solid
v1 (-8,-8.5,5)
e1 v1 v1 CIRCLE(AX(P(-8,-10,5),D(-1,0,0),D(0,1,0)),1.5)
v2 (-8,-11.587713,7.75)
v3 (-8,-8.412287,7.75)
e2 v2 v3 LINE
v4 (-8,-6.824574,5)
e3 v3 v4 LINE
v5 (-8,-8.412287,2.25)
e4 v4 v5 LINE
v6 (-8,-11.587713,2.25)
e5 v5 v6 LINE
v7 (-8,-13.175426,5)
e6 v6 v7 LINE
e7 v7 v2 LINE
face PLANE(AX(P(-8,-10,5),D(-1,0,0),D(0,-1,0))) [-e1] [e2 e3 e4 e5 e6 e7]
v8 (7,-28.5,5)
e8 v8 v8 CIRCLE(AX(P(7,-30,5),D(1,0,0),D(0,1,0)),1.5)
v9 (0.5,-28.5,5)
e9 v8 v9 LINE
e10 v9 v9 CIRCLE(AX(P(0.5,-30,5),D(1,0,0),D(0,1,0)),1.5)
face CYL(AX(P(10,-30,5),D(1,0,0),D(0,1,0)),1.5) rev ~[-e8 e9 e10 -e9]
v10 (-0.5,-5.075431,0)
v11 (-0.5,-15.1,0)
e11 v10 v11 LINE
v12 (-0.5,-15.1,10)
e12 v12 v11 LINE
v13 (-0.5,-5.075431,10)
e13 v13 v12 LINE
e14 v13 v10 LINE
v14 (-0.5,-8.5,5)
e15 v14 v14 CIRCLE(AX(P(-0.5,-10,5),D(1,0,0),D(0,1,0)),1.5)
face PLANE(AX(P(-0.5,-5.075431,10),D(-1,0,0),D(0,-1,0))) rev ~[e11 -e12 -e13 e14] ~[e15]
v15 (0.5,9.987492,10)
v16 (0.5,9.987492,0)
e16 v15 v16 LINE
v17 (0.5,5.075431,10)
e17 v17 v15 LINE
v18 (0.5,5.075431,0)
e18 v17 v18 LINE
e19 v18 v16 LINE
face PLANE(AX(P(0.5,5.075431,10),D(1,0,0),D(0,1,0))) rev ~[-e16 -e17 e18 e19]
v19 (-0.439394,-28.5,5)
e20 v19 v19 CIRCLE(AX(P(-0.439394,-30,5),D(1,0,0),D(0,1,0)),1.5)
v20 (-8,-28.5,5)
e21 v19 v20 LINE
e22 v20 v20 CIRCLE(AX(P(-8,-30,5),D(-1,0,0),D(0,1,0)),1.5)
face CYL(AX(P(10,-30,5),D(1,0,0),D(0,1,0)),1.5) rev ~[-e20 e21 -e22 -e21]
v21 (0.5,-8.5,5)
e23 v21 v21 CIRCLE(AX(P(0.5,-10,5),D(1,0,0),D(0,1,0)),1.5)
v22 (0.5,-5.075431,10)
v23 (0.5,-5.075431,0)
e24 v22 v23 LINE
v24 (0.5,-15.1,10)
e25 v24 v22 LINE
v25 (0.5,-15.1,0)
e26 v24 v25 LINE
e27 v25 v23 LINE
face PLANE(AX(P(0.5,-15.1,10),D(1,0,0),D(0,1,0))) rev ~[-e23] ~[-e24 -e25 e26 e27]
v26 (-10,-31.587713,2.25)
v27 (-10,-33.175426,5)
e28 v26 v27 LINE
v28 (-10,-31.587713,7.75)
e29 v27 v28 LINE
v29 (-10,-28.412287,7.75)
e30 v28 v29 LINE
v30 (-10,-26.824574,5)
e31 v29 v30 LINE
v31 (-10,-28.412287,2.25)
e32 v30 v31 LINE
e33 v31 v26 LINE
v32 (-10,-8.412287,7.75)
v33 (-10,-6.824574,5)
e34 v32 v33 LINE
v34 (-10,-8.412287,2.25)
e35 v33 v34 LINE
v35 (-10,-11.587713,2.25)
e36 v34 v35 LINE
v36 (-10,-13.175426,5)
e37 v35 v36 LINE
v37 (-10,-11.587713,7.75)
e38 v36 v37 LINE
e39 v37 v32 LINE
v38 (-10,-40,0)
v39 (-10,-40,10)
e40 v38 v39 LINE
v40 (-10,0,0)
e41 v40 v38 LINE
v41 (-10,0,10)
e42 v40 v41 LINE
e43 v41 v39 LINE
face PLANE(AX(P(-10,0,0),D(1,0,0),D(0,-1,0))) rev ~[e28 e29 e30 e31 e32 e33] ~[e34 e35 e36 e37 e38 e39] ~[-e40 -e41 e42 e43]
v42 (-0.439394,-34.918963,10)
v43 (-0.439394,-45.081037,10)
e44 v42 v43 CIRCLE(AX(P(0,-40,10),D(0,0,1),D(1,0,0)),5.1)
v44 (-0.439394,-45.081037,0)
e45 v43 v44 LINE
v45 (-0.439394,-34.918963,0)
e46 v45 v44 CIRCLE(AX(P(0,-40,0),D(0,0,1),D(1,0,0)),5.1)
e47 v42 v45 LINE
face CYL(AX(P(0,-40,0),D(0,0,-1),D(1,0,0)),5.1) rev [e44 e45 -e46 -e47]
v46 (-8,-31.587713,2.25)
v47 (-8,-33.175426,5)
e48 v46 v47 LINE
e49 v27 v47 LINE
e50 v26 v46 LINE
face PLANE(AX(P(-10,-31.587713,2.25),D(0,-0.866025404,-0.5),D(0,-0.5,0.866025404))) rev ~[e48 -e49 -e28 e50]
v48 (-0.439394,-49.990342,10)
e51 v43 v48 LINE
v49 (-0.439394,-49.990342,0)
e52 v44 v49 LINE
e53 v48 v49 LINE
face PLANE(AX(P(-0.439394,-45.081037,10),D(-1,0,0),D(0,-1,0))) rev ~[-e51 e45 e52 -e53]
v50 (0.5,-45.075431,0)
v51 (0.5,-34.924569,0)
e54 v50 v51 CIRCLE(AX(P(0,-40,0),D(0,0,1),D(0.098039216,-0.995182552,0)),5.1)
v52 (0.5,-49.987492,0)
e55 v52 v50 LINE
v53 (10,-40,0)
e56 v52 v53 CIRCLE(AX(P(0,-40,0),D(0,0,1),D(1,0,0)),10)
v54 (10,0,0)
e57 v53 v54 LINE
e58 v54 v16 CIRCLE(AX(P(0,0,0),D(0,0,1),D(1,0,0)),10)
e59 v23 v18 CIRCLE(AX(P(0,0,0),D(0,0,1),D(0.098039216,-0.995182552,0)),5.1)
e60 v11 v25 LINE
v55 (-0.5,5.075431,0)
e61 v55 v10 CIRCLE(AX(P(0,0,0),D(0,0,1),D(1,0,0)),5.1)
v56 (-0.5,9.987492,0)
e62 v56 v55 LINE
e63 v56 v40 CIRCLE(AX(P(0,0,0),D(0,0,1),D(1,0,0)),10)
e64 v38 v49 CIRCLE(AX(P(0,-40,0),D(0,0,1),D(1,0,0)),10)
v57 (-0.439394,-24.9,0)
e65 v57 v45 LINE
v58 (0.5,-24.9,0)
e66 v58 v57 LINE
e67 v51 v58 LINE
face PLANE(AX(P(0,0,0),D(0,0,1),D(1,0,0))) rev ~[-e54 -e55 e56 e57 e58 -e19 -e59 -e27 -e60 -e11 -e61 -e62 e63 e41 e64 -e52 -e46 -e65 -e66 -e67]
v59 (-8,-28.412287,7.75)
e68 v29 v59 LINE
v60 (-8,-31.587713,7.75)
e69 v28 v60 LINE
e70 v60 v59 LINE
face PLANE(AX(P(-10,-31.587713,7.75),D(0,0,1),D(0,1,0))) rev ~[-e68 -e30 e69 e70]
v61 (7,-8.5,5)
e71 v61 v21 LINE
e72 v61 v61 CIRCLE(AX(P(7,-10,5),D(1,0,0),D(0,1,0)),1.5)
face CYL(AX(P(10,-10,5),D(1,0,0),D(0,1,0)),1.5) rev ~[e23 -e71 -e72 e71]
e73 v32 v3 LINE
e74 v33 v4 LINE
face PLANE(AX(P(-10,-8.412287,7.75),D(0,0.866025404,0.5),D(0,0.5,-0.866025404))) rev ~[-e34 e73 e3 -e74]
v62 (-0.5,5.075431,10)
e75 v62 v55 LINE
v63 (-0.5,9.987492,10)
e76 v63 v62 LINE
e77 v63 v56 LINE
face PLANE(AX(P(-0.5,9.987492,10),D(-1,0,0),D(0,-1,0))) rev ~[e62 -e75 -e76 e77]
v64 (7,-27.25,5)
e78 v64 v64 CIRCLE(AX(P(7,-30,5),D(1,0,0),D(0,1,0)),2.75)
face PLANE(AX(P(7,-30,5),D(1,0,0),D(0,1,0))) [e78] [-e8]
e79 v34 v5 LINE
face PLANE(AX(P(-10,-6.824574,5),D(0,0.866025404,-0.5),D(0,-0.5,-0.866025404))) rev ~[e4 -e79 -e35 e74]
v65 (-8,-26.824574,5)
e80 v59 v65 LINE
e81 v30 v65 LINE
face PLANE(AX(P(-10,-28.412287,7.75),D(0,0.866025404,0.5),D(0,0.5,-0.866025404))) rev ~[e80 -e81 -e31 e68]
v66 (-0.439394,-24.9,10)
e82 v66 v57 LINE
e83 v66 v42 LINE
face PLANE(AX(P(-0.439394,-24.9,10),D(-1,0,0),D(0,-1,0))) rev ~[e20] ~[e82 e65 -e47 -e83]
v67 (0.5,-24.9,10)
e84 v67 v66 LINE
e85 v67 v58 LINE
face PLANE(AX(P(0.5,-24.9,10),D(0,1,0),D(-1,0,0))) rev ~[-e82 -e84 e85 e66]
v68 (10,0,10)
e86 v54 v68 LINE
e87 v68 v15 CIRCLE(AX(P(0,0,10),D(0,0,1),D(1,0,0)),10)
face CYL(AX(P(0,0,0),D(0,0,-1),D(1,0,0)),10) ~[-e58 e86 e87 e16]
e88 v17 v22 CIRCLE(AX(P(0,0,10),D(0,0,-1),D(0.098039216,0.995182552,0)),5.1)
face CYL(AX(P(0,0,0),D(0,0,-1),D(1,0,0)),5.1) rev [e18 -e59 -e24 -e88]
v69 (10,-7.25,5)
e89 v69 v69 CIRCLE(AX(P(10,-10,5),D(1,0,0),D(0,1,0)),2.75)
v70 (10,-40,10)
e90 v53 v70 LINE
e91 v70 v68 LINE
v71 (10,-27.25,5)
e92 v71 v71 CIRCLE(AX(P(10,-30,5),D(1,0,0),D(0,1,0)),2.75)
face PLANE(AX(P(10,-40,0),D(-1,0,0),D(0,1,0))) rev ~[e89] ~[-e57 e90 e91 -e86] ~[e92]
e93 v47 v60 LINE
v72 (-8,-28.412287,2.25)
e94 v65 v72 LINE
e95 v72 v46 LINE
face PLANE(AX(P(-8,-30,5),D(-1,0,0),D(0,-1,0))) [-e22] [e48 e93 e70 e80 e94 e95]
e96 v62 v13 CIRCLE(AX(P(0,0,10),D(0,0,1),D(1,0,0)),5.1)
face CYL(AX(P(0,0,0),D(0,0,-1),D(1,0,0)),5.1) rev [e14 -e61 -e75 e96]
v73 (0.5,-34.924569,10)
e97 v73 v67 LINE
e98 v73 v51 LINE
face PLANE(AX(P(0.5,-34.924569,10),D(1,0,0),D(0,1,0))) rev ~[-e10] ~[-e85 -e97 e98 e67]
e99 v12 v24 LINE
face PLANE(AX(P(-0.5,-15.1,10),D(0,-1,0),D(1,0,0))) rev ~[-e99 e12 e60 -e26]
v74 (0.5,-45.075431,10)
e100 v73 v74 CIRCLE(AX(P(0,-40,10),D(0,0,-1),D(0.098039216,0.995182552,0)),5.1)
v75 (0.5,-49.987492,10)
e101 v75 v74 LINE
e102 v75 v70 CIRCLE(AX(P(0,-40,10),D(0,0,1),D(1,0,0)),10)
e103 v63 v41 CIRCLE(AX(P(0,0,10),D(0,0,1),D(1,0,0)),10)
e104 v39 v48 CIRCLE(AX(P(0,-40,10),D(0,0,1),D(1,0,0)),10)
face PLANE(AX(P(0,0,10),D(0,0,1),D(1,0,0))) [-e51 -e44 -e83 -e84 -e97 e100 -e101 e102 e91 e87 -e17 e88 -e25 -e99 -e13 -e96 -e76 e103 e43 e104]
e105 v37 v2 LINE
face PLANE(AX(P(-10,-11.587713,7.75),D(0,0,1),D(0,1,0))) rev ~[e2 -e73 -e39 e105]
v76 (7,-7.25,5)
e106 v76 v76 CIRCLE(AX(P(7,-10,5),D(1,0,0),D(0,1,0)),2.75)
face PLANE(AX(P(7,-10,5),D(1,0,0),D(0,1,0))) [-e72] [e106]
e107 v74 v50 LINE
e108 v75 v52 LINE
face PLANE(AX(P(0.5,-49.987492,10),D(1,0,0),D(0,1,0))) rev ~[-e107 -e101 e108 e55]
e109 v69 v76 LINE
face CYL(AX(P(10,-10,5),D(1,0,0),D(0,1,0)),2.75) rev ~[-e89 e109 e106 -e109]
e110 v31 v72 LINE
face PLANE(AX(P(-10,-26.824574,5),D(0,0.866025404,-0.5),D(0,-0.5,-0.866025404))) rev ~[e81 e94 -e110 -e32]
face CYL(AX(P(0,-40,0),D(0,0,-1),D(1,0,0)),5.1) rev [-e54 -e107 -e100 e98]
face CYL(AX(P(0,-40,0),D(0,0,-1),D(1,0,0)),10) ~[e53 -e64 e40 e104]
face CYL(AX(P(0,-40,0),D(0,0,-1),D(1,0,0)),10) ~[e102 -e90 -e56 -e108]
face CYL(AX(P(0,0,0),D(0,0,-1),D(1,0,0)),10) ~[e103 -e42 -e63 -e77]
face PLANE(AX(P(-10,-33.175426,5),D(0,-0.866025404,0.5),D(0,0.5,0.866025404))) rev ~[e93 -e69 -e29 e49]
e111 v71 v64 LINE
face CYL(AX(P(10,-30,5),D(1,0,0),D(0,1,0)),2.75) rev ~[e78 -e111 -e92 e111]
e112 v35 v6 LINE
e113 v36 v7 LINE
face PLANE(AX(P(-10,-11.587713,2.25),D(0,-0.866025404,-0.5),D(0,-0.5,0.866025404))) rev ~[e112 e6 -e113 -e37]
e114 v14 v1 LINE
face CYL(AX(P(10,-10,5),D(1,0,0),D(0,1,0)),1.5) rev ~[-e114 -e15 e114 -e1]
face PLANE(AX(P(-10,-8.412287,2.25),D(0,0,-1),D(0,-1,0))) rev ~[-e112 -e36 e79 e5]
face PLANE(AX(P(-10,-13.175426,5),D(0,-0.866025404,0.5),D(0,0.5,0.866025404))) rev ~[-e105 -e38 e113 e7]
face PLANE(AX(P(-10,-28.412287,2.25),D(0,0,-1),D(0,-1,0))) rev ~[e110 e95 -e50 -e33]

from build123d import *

# Parameters (mm, degrees)
F0_R     = 5.1
F1_DEPTH = 10
F2_R     = 1.5
F3_DEPTH = 25
F5_DEPTH = 25
F6_R     = 2.75
F6_R_2   = 1.5
F7_DEPTH = 3
F8_R     = 1.5
F9_DEPTH = 2


# Not quite as in the source:
# - a feature names something its author has since deleted; it is built from what else it names


with BuildPart() as f1:
    # F0 (on Top) → F1 (new body)
    with BuildSketch(Plane.XY):
        with BuildLine():
            ThreePointArc((-10, 0), (0, -10), (10, 0))
            ThreePointArc((10, 0), (0, 10), (-10, 0))
        make_face()
        Circle(F0_R, mode=Mode.SUBTRACT)
        with BuildLine():
            Line((10, -40), (10, 0))
            ThreePointArc((10, 0), (0, -10), (-10, 0))
            Line((-10, 0), (-10, -40))
            ThreePointArc((-10, -40), (0, -30), (10, -40))
        make_face()
        with BuildLine():
            ThreePointArc((-10, -40), (0, -50), (10, -40))
            ThreePointArc((10, -40), (0, -30), (-10, -40))
        make_face()
        with Locations((0, -40)):
            Circle(F0_R, mode=Mode.SUBTRACT)
    extrude(amount=F1_DEPTH)

    # F2 (on face) → F3 (cut)
    with BuildSketch(Plane.YZ.offset(10)):
        with Locations((-30, 5)):
            Circle(F2_R)
        with Locations((-10, 5)):
            Circle(F2_R)
    extrude(amount=-F3_DEPTH, mode=Mode.SUBTRACT)

    # F4 (on face) → F5 (cut)
    with BuildSketch(Plane.XY.offset(10)):
        with BuildLine():
            ThreePointArc((0.5, 9.9874921777), (0, 10), (-0.5, 9.9874921777))
            Line((-0.5, 9.9874921777), (-0.5, 5.0754310162))
            ThreePointArc((-0.5, 5.0754310162), (0, 5.1), (0.5, 5.0754310162))
            Line((0.5, 5.0754310162), (0.5, 9.9874921777))
        make_face()
        with BuildLine():
            ThreePointArc((0.5, -5.0754310162), (0, -5.1), (-0.5, -5.0754310162))
            Line((-0.5, -5.0754310162), (-0.5, -15.1))
            Line((-0.5, -15.1), (0.5, -15.1))
            Line((0.5, -15.1), (0.5, -5.0754310162))
        make_face()
        with BuildLine():
            Line((-0.439394009, -45.0810365975), (-0.439394009, -49.9903419814))
            ThreePointArc((-0.439394009, -49.9903419814), (0.0303364777, -49.9999539848), (0.5, -49.9874921777))
            Line((0.5, -49.9874921777), (0.5, -45.0754310162))
            ThreePointArc((0.5, -45.0754310162), (0.0304323376, -45.0999092024), (-0.439394009, -45.0810365975))
        make_face()
        with BuildLine():
            Line((-0.439394009, -24.9), (-0.439394009, -34.9189634025))
            ThreePointArc((-0.439394009, -34.9189634025), (0.0304323376, -34.9000907976), (0.5, -34.9245689838))
            Line((0.5, -34.9245689838), (0.5, -24.9))
            Line((0.5, -24.9), (-0.439394009, -24.9))
        make_face()
    extrude(amount=-F5_DEPTH, mode=Mode.SUBTRACT)

    # F6 (on face) → F7 (cut)
    with BuildSketch(Plane.YZ.offset(10)):
        with Locations((-30, 5)):
            Circle(F6_R)
        with Locations((-30, 5)):
            Circle(F6_R_2, mode=Mode.SUBTRACT)
        with Locations((-10, 5)):
            Circle(F6_R)
        with Locations((-10, 5)):
            Circle(F6_R_2, mode=Mode.SUBTRACT)
    extrude(amount=-F7_DEPTH, mode=Mode.SUBTRACT)

    # F8 (on face) → F9 (cut)
    with BuildSketch(Plane(origin=(-10, 0, 0), x_dir=(0, -1, 0), z_dir=(-1, 0, 0))):
        Polygon((8.4122867597, 2.25), (11.5877132403, 2.25), (13.1754264805, 5), (11.5877132403, 7.75), (8.4122867597, 7.75), (6.8245735195, 5), align=None)
        with Locations((10, 5)):
            Circle(F8_R, mode=Mode.SUBTRACT)
        Polygon((28.4122867597, 2.25), (31.5877132403, 2.25), (33.1754264805, 5), (31.5877132403, 7.75), (28.4122867597, 7.75), (26.8245735195, 5), align=None)
        with Locations((30, 5)):
            Circle(F8_R, mode=Mode.SUBTRACT)
    extrude(amount=-F9_DEPTH, mode=Mode.SUBTRACT)


solid = f1.part
